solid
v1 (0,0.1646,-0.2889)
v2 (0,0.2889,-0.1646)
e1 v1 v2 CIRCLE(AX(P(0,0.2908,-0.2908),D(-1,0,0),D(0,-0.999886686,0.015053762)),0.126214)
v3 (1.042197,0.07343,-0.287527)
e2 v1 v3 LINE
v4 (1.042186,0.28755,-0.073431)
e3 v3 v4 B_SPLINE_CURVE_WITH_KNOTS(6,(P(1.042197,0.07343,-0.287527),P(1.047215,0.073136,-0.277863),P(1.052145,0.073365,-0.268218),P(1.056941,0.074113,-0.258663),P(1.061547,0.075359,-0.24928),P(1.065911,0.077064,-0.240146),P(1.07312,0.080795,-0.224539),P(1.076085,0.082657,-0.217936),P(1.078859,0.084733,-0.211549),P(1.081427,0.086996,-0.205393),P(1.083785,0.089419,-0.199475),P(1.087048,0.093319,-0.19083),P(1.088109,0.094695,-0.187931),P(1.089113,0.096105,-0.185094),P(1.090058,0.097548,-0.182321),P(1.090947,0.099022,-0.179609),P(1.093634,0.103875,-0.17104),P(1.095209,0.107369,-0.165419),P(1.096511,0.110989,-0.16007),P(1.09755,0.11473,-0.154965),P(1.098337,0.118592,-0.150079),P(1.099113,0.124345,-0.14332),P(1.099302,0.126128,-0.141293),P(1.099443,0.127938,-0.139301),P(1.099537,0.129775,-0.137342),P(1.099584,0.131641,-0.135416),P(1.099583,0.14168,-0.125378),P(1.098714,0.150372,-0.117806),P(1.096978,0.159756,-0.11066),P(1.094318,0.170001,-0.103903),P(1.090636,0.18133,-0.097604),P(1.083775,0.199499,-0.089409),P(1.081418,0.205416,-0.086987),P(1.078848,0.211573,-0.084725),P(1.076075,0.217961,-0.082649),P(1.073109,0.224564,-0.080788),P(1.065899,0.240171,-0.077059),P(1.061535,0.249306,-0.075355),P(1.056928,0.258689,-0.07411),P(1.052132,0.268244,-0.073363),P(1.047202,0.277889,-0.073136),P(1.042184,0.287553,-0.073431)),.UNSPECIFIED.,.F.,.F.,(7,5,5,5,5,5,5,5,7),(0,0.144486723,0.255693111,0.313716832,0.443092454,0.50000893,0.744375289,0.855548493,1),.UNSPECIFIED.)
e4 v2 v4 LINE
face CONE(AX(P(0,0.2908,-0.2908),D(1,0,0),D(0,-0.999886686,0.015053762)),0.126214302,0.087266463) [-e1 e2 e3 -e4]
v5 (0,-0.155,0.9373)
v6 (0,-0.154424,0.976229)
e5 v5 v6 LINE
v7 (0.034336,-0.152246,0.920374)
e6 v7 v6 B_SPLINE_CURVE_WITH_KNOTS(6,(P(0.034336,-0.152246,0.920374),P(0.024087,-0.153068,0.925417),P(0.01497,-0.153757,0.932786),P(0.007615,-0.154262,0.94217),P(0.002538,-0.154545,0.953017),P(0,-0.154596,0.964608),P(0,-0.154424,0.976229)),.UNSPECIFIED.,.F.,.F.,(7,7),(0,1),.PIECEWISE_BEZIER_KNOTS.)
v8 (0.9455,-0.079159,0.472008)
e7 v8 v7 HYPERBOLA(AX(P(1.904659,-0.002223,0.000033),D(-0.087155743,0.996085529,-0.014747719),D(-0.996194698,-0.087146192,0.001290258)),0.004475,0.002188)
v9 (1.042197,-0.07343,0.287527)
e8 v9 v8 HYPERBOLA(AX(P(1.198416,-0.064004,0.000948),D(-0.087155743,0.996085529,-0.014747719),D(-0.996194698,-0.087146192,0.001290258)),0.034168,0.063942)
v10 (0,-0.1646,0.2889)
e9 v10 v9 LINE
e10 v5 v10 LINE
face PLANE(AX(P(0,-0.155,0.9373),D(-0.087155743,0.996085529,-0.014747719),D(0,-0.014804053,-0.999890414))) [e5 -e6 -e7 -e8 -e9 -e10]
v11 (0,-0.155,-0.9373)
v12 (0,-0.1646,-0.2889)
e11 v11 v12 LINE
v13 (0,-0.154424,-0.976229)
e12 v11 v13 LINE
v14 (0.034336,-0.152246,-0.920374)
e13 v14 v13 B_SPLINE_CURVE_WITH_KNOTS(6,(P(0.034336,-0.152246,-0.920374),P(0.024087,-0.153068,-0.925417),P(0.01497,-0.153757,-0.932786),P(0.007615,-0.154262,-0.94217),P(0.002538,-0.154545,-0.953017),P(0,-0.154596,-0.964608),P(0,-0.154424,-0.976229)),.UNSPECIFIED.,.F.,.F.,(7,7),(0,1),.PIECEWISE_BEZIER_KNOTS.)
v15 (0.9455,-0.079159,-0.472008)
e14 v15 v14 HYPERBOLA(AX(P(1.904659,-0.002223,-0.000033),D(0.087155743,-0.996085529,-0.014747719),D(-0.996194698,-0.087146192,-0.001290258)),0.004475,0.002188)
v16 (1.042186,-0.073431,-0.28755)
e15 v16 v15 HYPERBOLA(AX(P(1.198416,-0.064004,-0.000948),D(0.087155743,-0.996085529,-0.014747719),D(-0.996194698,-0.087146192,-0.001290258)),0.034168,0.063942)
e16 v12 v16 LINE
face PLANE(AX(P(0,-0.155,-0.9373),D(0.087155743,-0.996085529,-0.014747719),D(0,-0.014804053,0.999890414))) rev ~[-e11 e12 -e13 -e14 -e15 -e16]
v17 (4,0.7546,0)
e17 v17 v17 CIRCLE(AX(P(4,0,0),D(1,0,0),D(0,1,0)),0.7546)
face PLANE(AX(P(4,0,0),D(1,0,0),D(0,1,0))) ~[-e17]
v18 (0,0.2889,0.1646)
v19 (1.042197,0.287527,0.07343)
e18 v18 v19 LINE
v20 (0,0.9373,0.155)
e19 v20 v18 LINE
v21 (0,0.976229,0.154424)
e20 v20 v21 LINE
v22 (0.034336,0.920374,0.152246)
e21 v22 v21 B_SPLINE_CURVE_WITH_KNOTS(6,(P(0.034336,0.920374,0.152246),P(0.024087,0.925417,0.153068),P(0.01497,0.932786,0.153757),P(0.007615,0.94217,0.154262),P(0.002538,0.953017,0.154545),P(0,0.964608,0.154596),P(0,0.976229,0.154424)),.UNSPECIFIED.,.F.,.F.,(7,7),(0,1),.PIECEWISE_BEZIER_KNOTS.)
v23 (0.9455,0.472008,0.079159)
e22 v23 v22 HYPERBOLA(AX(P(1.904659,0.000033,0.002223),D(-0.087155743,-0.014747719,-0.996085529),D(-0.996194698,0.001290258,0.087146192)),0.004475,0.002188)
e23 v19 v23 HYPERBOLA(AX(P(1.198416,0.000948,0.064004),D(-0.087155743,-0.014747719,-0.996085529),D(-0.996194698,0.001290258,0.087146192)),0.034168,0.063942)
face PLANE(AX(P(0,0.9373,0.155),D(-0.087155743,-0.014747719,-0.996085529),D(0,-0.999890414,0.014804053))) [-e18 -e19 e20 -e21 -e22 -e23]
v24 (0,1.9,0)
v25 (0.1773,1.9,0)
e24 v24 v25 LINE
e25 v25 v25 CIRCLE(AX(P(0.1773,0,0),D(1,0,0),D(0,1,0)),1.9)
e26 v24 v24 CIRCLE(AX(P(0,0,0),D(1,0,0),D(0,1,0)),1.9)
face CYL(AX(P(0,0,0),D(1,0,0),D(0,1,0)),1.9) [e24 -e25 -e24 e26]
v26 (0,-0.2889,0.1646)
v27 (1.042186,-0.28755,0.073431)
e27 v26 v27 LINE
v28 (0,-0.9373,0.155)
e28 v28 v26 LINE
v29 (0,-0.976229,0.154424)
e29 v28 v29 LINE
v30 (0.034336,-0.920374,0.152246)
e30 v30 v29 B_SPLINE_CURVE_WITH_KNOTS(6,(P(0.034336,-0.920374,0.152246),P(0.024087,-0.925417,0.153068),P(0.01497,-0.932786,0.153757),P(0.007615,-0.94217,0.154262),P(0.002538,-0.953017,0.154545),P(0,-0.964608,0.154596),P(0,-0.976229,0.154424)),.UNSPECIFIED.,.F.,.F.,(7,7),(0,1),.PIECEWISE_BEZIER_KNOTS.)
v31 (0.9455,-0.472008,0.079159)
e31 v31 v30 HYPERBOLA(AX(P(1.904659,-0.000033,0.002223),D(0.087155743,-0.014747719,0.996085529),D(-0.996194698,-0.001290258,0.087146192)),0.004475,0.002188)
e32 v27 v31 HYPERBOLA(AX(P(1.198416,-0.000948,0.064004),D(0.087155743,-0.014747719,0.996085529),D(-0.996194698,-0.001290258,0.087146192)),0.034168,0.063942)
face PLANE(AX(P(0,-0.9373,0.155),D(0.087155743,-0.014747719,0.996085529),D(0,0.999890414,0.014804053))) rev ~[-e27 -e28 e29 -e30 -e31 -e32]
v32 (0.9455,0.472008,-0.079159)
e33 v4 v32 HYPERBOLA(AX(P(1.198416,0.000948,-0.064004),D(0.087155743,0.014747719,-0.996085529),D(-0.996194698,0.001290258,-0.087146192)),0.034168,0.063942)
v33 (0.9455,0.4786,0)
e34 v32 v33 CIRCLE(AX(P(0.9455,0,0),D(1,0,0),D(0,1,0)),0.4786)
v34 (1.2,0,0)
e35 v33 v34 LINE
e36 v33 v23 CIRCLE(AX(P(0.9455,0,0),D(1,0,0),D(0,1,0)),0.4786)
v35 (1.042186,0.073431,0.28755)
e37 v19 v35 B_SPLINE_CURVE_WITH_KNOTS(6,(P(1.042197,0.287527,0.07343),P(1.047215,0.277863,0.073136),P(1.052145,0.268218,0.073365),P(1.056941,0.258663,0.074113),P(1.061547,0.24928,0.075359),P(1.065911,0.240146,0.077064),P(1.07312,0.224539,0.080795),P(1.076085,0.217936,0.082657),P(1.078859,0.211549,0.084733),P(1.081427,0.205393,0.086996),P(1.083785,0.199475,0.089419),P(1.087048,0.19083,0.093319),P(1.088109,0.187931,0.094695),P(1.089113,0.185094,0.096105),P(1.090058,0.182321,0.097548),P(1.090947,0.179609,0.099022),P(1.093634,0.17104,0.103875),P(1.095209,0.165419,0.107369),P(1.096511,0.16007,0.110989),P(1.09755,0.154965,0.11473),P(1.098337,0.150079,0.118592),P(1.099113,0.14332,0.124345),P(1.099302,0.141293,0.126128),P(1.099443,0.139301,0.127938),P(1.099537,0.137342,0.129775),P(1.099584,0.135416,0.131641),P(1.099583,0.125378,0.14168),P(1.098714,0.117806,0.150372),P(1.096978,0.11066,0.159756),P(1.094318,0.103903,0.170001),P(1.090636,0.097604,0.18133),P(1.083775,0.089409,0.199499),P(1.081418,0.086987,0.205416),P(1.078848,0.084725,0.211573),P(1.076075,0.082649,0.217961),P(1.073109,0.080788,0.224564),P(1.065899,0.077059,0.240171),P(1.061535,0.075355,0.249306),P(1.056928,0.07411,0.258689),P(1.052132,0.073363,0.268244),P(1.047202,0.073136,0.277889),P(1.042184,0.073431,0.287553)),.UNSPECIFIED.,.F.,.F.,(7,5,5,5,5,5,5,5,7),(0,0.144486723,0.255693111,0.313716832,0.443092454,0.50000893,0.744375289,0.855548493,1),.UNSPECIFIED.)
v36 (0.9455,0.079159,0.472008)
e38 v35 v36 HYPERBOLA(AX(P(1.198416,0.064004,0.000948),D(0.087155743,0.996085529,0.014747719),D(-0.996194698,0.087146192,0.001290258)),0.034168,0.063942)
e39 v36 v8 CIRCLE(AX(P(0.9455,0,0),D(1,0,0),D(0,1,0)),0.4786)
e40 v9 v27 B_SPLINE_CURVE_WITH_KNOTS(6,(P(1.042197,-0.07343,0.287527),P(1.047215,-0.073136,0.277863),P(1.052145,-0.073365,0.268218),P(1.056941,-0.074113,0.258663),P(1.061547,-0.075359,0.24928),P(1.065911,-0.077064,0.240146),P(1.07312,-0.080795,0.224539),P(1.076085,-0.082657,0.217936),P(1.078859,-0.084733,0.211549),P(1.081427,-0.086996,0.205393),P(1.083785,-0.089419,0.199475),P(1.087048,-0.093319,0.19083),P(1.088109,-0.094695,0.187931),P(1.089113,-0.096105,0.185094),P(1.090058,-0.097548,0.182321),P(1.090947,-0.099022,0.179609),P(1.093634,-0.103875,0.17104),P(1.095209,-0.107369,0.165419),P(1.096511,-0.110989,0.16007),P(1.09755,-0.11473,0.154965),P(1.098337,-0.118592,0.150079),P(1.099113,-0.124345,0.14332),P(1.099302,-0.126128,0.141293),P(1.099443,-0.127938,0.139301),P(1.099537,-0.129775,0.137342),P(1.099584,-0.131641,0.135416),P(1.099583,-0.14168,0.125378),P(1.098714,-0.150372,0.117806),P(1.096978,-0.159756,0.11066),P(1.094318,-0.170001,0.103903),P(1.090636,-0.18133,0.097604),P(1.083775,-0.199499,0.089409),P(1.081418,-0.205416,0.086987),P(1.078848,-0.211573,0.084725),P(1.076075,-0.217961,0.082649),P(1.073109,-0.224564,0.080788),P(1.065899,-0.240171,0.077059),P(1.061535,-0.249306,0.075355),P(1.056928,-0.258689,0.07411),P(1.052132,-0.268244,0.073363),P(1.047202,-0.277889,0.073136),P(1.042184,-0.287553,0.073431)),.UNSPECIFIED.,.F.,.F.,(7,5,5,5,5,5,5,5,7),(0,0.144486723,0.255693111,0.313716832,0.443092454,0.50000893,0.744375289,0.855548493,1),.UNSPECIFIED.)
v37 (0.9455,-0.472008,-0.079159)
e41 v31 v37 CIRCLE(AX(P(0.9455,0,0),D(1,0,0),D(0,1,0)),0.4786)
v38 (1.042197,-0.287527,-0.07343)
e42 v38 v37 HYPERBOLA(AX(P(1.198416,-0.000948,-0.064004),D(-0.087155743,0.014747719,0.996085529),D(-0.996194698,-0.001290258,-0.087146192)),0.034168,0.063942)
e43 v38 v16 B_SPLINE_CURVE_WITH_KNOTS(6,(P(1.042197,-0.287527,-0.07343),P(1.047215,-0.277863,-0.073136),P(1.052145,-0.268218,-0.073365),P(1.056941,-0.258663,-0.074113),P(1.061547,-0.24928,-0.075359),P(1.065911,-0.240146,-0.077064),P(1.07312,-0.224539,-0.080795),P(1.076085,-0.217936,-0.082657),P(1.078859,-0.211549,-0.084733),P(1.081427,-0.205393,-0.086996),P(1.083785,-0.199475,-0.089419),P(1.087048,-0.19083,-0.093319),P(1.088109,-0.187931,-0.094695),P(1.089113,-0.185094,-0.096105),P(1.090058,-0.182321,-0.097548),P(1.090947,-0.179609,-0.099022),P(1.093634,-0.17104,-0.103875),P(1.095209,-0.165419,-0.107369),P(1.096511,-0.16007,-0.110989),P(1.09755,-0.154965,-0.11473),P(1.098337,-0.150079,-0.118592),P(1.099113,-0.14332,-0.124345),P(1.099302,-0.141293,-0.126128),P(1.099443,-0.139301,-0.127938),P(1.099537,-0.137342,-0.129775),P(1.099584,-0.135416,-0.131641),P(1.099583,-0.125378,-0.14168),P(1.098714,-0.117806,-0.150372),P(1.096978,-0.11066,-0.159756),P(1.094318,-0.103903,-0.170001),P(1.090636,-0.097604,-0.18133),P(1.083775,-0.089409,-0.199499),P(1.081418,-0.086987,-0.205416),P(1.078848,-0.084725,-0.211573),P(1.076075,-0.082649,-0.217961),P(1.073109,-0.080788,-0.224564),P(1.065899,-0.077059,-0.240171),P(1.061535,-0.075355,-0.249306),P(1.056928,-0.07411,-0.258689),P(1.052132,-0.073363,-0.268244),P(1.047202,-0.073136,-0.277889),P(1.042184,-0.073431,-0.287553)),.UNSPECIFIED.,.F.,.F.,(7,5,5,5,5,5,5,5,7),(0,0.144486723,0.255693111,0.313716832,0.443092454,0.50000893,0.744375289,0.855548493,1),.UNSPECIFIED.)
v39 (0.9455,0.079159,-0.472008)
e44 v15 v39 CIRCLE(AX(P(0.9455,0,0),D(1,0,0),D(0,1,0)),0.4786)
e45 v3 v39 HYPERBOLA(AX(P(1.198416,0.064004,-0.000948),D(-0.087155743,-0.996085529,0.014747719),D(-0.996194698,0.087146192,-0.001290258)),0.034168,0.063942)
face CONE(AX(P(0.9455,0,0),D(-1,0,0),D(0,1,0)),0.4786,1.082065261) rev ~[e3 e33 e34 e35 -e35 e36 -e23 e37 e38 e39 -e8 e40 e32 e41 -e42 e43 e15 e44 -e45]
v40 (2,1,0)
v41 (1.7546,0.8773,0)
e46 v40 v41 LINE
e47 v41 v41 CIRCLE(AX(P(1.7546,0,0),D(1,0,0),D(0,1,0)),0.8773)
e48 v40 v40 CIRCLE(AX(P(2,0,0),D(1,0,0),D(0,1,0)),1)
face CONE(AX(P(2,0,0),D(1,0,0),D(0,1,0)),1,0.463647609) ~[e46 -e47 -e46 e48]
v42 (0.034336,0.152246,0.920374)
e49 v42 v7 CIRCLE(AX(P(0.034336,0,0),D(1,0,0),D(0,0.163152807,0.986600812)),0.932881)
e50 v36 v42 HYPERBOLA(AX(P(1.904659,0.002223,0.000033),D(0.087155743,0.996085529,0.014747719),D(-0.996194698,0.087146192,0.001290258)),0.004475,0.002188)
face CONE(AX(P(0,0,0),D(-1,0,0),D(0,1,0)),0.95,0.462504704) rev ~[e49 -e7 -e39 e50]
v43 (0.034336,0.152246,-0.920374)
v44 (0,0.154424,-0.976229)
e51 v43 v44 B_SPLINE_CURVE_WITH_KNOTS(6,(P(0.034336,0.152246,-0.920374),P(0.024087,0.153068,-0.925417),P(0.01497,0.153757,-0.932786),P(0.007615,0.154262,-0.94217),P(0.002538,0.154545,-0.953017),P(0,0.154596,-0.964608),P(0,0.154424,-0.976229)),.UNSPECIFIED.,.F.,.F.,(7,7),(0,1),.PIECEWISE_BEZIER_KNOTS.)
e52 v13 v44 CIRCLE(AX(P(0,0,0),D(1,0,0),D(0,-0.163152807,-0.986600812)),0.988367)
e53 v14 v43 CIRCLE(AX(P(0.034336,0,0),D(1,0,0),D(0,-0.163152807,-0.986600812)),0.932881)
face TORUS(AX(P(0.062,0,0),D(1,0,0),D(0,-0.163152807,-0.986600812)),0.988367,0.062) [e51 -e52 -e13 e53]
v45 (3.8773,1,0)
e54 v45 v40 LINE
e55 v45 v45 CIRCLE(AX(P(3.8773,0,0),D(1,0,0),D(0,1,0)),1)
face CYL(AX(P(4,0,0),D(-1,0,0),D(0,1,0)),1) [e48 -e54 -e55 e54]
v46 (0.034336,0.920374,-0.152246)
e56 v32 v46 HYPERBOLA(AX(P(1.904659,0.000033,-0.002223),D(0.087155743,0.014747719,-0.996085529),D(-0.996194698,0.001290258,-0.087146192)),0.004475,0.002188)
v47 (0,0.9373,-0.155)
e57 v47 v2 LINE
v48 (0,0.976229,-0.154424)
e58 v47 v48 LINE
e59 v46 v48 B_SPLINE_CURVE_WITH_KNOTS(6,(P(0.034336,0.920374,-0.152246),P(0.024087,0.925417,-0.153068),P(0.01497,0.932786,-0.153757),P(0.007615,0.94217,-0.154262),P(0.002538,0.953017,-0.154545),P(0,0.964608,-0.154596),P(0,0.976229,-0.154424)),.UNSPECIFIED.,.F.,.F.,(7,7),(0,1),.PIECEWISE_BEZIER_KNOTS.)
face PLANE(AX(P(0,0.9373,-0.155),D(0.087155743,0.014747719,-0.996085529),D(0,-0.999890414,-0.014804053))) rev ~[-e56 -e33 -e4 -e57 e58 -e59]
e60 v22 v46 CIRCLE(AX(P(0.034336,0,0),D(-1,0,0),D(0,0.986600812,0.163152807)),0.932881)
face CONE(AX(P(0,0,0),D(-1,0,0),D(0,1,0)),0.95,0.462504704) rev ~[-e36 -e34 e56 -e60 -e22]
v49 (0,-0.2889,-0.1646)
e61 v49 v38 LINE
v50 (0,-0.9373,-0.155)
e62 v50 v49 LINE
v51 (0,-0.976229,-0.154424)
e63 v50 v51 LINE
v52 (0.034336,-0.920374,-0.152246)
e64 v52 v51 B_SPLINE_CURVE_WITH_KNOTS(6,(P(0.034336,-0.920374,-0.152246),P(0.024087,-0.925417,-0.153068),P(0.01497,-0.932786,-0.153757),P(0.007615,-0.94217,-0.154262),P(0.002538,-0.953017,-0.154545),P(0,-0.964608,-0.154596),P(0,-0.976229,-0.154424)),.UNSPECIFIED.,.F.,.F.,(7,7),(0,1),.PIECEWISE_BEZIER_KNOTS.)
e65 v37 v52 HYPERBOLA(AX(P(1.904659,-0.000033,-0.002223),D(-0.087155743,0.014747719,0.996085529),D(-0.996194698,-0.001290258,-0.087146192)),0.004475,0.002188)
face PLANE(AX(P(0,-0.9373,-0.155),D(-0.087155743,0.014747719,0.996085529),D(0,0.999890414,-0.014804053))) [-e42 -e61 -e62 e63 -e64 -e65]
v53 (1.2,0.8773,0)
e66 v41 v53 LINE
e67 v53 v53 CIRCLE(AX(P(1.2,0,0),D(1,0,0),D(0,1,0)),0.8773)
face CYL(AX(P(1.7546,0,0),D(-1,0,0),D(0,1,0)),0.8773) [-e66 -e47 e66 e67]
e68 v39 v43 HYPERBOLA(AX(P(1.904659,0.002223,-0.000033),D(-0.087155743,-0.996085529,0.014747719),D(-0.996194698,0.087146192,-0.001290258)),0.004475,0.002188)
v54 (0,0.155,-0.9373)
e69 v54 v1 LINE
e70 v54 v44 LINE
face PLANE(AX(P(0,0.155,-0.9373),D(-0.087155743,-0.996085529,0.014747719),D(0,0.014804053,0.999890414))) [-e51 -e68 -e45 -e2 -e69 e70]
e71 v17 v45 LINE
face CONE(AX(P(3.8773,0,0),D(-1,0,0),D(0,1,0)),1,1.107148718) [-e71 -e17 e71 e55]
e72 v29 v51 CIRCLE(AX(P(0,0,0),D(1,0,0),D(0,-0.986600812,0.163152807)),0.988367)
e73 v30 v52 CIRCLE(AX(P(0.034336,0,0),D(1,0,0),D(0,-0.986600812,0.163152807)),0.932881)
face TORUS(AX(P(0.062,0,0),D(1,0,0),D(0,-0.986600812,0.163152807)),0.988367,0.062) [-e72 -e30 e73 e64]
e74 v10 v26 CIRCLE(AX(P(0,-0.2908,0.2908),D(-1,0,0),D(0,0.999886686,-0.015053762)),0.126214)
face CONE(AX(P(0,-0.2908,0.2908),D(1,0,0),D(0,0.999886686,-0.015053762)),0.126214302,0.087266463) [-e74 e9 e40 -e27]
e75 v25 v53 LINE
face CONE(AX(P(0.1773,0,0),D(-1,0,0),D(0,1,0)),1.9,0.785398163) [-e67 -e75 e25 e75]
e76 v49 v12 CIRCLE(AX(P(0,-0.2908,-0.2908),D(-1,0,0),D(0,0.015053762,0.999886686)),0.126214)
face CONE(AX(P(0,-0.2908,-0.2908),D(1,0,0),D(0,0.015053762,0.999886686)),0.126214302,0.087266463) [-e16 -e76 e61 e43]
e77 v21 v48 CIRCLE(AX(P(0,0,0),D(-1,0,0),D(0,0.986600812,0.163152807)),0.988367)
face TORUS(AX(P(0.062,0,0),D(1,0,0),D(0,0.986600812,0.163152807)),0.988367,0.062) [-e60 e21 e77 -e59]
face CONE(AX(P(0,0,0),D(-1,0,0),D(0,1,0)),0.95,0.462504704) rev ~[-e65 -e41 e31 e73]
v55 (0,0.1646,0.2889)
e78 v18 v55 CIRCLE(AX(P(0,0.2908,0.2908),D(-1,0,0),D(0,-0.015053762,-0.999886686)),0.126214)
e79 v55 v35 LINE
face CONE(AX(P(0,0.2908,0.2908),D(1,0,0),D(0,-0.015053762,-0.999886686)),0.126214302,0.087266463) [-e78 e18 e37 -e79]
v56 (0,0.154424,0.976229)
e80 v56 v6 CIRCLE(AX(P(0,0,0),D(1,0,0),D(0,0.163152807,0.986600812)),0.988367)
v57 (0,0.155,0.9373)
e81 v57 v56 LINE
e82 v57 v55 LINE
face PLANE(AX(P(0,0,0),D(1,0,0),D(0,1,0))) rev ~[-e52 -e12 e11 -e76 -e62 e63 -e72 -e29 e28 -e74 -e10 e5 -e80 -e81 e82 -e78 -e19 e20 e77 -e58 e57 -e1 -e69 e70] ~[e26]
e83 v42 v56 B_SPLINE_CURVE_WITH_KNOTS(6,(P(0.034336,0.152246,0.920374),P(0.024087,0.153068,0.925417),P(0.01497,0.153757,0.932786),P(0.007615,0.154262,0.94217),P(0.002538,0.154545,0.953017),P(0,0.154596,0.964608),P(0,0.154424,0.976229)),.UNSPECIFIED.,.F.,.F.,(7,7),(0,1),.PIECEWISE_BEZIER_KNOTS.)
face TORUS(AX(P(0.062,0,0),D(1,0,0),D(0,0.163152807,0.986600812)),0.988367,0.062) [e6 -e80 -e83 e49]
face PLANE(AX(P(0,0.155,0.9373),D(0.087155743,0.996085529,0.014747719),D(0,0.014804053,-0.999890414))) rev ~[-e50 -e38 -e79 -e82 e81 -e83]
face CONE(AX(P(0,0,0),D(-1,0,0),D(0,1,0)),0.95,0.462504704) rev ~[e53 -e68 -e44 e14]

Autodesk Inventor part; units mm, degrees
ref_plane "YZ Plane" through (0, 0, 0) normal (1, 0, 0) x (0, 1, 0)
ref_plane "XZ Plane" through (0, 0, 0) normal (0, 1, 0) x (-1, 0, 0)
sketch "Skizze1" plane through (0, 0, 0) normal (0, 0, 1) x (1, 0, 0)
  line L0 (1.2, 0) -> (4, 0)
  line L1 (4, 0) -> (4, 1)
  line L2 (4, 1) -> (2, 1)
  line L3 (2, 1) -> (1.7546, 0.8773)
  line L4 (1.7546, 0.8773) -> (1.2, 0.8773)
  line L5 (0, 1.9) -> (0, 0.95)
  line L6 (0, 0.95) -> (0.9455, 0.4786)
  line L7 (0.9455, 0.4786) -> (1.2, 0)
  line L8 (-0.8, 0) -> (4.8, 0) projected
  line L9 (0, -0.38) -> (0, 2.28) projected
  line L10 (0, 1.9) -> (0.1773, 1.9)
  line L11 (0.1773, 1.9) -> (1.2, 0.8773)
  line L12 (2, 1) -> (1.0773, 1) construction
  dimension "d1" = 2
  dimension "d2" = 2
  dimension "d3" = 1.7546
  dimension "d4" = 1.9
  dimension "d5" = 26.5
  dimension "d6" = 62
  dimension "d7" = 1.2
  dimension "d8" = 0.2454
  dimension "d12" = 3.8
  dimension "d13" = 45
  dimension "d15" = 4
  dimension "d24" = 1.2
revolve "Körper" add sketch "Skizze1" angle 360 about axis through (1.2, 0, 0) along (1, 0, 0) contours L7 L6 L5 L10 L11 L4 L3 L2 L1 L0
sketch "Skizze2" plane through (0, 0, 0) normal (-1, 0, 0) x (0, 0, 1)
  line L0 (0, 0.95) -> (0, 0) construction
  line L1 (0, 0) -> (0.95, 0) construction
  arc A0 (0.285, 0) -> (0, 0.285) centre (0, 0) ccw construction
  arc A1 (0.3325, 0) -> (0, 0.3325) centre (0, 0) ccw construction
  arc A2 (0.9373, 0.155) -> (0.155, 0.9373) centre (0, 0) ccw
  line L2 (0, 0) -> (0.6718, 0.6718) construction
  line L3 (0.155, 0.9373) -> (0.1646, 0.2889)
  line L4 (0.9373, 0.155) -> (0.2889, 0.1646)
  arc A3 (0.155, 0.9373) -> (0, 0.95) centre (0, 0) ccw
  arc A4 (0.95, 0) -> (0.9373, 0.155) centre (0, 0) ccw
  line L5 (0, -2.66) -> (0, 2.66) projected
  line L6 (-2.66, 0) -> (2.66, 0) projected
  arc A5 (0.155, -0.9373) -> (0.9373, -0.155) centre (0, 0) ccw
  line L7 (0.155, -0.9373) -> (0.1646, -0.2889)
  line L8 (0.9373, -0.155) -> (0.2889, -0.1646)
  arc A6 (0, -0.95) -> (0.155, -0.9373) centre (0, 0) ccw
  arc A7 (0.9373, -0.155) -> (0.95, 0) centre (0, 0) ccw
  arc A8 (-0.155, 0.9373) -> (-0.9373, 0.155) centre (0, 0) ccw
  line L9 (-0.155, 0.9373) -> (-0.1646, 0.2889)
  line L10 (-0.9373, 0.155) -> (-0.2889, 0.1646)
  arc A9 (0, 0.95) -> (-0.155, 0.9373) centre (0, 0) ccw
  arc A10 (-0.9373, 0.155) -> (-0.95, 0) centre (0, 0) ccw
  arc A11 (-0.155, -0.9373) -> (0, -0.95) centre (0, 0) ccw
  arc A12 (-0.9373, -0.155) -> (-0.155, -0.9373) centre (0, 0) ccw
  arc A13 (-0.95, 0) -> (-0.9373, -0.155) centre (0, 0) ccw
  line L11 (-0.9373, -0.155) -> (-0.2889, -0.1646)
  line L12 (-0.155, -0.9373) -> (-0.1646, -0.2889)
  arc A14 (0.1646, 0.2889) -> (0.2889, 0.1646) centre (0.2908, 0.2908) ccw
  arc A15 (0.2889, -0.1646) -> (0.1646, -0.2889) centre (0.2908, -0.2908) ccw
  arc A16 (-0.2889, 0.1646) -> (-0.1646, 0.2889) centre (-0.2908, 0.2908) ccw
  arc A17 (-0.1646, -0.2889) -> (-0.2889, -0.1646) centre (-0.2908, -0.2908) ccw
  point P0 (0.6718, -0.6718)
  point P1 (-0.6718, 0.6718)
  point P2 (-0.6718, -0.6718)
  dimension "d17" = 0.57
  dimension "d18" = 0.665
  dimension "d19" = 1.9
  dimension "d20" = 45
  dimension "d21" = 0.155
extrude "Loch" add sketch "Skizze2" against normal up to next draft 5 contours L4 A14 L3 A2 | A5 L7 A15 L8 | L9 A16 L10 A8 | A12 L11 A17 L12
fillet "Rundung1" radius 0.062 4 edges at (0, 0.95, 0) (0, 0, -0.95) (0, -0.95, 0) (0, 0, 0.95)
thread "Gewinde" size "M2x0.4" class "6g" standard "ISO Metric profile" length 2
chamfer "Fase1" distance 0.2454 distance2 0.1227 1 edges at (4, -1, 0) measured on face at (4, 0.479, -0.3842)
ref_plane "Work Plane2" through (3.35, 0, 0) normal (0, 0, -1) x (1, 0, 0)
equation "\"d1\" = GEL"
equation "\"d2\" = GD"
equation "\"d3\" = BDM"
equation "\"d4\" = SDM"
equation "\"d7\" = INTI"
equation "\"d8\" = GAL"
equation "\"d12\" = KOD"
equation "\"d13\" = 0.5 * SEWI"
equation "\"d15\" = NLG"
equation "\"d24\" = KOH"
equation "\"d17\" = 0.3 * SDM"
equation "\"d18\" = 0.35 * SDM"
equation "\"d19\" = SDM"
equation "\"d21\" = 0.5 * SBR"
equation "\"d23\" = 0.2 * SBR"
equation "\"d10\" = GEL"
equation "\"d25\" = -0.5 * SPD + 0.5 * GD"
equation "\"d26\" = 0.5 * GAL"
equation "\"NLG\" = 4"
equation "\"GEL\" = 2"
equation "\"GAL\" = 0.61345 * PTC"
equation "\"SPD\" = NND - 1.2269 * PTC"
equation "\"KOD\" = 3.8"
equation "\"KOH\" = 1.2"
equation "\"SBR\" = 0.31"
equation "\"INTI\" = 1.2"
equation "\"SDM\" = 1.9"
equation "\"GD\" = NND"
equation "\"BDM\" = NND - GAL"
equation "\"SEWI\" = 90deg"
equation "\"d9\" = SDM"
equation "\"GUL\" = 0.61345 * PTC"
equation "\"TOA\" = 30deg"
equation "\"EPV\" = 2.2"
equation "\"THREADDIA\" = 2"
equation "\"PTC\" = 0.4"
equation "\"NND\" = 2"
equation "\"GD1\" = THREADDIA - 1.2269 * PTC"
properties part number "ISO 7046-1 - M2 x 4 - 4.8 - H" material "Stahl"
